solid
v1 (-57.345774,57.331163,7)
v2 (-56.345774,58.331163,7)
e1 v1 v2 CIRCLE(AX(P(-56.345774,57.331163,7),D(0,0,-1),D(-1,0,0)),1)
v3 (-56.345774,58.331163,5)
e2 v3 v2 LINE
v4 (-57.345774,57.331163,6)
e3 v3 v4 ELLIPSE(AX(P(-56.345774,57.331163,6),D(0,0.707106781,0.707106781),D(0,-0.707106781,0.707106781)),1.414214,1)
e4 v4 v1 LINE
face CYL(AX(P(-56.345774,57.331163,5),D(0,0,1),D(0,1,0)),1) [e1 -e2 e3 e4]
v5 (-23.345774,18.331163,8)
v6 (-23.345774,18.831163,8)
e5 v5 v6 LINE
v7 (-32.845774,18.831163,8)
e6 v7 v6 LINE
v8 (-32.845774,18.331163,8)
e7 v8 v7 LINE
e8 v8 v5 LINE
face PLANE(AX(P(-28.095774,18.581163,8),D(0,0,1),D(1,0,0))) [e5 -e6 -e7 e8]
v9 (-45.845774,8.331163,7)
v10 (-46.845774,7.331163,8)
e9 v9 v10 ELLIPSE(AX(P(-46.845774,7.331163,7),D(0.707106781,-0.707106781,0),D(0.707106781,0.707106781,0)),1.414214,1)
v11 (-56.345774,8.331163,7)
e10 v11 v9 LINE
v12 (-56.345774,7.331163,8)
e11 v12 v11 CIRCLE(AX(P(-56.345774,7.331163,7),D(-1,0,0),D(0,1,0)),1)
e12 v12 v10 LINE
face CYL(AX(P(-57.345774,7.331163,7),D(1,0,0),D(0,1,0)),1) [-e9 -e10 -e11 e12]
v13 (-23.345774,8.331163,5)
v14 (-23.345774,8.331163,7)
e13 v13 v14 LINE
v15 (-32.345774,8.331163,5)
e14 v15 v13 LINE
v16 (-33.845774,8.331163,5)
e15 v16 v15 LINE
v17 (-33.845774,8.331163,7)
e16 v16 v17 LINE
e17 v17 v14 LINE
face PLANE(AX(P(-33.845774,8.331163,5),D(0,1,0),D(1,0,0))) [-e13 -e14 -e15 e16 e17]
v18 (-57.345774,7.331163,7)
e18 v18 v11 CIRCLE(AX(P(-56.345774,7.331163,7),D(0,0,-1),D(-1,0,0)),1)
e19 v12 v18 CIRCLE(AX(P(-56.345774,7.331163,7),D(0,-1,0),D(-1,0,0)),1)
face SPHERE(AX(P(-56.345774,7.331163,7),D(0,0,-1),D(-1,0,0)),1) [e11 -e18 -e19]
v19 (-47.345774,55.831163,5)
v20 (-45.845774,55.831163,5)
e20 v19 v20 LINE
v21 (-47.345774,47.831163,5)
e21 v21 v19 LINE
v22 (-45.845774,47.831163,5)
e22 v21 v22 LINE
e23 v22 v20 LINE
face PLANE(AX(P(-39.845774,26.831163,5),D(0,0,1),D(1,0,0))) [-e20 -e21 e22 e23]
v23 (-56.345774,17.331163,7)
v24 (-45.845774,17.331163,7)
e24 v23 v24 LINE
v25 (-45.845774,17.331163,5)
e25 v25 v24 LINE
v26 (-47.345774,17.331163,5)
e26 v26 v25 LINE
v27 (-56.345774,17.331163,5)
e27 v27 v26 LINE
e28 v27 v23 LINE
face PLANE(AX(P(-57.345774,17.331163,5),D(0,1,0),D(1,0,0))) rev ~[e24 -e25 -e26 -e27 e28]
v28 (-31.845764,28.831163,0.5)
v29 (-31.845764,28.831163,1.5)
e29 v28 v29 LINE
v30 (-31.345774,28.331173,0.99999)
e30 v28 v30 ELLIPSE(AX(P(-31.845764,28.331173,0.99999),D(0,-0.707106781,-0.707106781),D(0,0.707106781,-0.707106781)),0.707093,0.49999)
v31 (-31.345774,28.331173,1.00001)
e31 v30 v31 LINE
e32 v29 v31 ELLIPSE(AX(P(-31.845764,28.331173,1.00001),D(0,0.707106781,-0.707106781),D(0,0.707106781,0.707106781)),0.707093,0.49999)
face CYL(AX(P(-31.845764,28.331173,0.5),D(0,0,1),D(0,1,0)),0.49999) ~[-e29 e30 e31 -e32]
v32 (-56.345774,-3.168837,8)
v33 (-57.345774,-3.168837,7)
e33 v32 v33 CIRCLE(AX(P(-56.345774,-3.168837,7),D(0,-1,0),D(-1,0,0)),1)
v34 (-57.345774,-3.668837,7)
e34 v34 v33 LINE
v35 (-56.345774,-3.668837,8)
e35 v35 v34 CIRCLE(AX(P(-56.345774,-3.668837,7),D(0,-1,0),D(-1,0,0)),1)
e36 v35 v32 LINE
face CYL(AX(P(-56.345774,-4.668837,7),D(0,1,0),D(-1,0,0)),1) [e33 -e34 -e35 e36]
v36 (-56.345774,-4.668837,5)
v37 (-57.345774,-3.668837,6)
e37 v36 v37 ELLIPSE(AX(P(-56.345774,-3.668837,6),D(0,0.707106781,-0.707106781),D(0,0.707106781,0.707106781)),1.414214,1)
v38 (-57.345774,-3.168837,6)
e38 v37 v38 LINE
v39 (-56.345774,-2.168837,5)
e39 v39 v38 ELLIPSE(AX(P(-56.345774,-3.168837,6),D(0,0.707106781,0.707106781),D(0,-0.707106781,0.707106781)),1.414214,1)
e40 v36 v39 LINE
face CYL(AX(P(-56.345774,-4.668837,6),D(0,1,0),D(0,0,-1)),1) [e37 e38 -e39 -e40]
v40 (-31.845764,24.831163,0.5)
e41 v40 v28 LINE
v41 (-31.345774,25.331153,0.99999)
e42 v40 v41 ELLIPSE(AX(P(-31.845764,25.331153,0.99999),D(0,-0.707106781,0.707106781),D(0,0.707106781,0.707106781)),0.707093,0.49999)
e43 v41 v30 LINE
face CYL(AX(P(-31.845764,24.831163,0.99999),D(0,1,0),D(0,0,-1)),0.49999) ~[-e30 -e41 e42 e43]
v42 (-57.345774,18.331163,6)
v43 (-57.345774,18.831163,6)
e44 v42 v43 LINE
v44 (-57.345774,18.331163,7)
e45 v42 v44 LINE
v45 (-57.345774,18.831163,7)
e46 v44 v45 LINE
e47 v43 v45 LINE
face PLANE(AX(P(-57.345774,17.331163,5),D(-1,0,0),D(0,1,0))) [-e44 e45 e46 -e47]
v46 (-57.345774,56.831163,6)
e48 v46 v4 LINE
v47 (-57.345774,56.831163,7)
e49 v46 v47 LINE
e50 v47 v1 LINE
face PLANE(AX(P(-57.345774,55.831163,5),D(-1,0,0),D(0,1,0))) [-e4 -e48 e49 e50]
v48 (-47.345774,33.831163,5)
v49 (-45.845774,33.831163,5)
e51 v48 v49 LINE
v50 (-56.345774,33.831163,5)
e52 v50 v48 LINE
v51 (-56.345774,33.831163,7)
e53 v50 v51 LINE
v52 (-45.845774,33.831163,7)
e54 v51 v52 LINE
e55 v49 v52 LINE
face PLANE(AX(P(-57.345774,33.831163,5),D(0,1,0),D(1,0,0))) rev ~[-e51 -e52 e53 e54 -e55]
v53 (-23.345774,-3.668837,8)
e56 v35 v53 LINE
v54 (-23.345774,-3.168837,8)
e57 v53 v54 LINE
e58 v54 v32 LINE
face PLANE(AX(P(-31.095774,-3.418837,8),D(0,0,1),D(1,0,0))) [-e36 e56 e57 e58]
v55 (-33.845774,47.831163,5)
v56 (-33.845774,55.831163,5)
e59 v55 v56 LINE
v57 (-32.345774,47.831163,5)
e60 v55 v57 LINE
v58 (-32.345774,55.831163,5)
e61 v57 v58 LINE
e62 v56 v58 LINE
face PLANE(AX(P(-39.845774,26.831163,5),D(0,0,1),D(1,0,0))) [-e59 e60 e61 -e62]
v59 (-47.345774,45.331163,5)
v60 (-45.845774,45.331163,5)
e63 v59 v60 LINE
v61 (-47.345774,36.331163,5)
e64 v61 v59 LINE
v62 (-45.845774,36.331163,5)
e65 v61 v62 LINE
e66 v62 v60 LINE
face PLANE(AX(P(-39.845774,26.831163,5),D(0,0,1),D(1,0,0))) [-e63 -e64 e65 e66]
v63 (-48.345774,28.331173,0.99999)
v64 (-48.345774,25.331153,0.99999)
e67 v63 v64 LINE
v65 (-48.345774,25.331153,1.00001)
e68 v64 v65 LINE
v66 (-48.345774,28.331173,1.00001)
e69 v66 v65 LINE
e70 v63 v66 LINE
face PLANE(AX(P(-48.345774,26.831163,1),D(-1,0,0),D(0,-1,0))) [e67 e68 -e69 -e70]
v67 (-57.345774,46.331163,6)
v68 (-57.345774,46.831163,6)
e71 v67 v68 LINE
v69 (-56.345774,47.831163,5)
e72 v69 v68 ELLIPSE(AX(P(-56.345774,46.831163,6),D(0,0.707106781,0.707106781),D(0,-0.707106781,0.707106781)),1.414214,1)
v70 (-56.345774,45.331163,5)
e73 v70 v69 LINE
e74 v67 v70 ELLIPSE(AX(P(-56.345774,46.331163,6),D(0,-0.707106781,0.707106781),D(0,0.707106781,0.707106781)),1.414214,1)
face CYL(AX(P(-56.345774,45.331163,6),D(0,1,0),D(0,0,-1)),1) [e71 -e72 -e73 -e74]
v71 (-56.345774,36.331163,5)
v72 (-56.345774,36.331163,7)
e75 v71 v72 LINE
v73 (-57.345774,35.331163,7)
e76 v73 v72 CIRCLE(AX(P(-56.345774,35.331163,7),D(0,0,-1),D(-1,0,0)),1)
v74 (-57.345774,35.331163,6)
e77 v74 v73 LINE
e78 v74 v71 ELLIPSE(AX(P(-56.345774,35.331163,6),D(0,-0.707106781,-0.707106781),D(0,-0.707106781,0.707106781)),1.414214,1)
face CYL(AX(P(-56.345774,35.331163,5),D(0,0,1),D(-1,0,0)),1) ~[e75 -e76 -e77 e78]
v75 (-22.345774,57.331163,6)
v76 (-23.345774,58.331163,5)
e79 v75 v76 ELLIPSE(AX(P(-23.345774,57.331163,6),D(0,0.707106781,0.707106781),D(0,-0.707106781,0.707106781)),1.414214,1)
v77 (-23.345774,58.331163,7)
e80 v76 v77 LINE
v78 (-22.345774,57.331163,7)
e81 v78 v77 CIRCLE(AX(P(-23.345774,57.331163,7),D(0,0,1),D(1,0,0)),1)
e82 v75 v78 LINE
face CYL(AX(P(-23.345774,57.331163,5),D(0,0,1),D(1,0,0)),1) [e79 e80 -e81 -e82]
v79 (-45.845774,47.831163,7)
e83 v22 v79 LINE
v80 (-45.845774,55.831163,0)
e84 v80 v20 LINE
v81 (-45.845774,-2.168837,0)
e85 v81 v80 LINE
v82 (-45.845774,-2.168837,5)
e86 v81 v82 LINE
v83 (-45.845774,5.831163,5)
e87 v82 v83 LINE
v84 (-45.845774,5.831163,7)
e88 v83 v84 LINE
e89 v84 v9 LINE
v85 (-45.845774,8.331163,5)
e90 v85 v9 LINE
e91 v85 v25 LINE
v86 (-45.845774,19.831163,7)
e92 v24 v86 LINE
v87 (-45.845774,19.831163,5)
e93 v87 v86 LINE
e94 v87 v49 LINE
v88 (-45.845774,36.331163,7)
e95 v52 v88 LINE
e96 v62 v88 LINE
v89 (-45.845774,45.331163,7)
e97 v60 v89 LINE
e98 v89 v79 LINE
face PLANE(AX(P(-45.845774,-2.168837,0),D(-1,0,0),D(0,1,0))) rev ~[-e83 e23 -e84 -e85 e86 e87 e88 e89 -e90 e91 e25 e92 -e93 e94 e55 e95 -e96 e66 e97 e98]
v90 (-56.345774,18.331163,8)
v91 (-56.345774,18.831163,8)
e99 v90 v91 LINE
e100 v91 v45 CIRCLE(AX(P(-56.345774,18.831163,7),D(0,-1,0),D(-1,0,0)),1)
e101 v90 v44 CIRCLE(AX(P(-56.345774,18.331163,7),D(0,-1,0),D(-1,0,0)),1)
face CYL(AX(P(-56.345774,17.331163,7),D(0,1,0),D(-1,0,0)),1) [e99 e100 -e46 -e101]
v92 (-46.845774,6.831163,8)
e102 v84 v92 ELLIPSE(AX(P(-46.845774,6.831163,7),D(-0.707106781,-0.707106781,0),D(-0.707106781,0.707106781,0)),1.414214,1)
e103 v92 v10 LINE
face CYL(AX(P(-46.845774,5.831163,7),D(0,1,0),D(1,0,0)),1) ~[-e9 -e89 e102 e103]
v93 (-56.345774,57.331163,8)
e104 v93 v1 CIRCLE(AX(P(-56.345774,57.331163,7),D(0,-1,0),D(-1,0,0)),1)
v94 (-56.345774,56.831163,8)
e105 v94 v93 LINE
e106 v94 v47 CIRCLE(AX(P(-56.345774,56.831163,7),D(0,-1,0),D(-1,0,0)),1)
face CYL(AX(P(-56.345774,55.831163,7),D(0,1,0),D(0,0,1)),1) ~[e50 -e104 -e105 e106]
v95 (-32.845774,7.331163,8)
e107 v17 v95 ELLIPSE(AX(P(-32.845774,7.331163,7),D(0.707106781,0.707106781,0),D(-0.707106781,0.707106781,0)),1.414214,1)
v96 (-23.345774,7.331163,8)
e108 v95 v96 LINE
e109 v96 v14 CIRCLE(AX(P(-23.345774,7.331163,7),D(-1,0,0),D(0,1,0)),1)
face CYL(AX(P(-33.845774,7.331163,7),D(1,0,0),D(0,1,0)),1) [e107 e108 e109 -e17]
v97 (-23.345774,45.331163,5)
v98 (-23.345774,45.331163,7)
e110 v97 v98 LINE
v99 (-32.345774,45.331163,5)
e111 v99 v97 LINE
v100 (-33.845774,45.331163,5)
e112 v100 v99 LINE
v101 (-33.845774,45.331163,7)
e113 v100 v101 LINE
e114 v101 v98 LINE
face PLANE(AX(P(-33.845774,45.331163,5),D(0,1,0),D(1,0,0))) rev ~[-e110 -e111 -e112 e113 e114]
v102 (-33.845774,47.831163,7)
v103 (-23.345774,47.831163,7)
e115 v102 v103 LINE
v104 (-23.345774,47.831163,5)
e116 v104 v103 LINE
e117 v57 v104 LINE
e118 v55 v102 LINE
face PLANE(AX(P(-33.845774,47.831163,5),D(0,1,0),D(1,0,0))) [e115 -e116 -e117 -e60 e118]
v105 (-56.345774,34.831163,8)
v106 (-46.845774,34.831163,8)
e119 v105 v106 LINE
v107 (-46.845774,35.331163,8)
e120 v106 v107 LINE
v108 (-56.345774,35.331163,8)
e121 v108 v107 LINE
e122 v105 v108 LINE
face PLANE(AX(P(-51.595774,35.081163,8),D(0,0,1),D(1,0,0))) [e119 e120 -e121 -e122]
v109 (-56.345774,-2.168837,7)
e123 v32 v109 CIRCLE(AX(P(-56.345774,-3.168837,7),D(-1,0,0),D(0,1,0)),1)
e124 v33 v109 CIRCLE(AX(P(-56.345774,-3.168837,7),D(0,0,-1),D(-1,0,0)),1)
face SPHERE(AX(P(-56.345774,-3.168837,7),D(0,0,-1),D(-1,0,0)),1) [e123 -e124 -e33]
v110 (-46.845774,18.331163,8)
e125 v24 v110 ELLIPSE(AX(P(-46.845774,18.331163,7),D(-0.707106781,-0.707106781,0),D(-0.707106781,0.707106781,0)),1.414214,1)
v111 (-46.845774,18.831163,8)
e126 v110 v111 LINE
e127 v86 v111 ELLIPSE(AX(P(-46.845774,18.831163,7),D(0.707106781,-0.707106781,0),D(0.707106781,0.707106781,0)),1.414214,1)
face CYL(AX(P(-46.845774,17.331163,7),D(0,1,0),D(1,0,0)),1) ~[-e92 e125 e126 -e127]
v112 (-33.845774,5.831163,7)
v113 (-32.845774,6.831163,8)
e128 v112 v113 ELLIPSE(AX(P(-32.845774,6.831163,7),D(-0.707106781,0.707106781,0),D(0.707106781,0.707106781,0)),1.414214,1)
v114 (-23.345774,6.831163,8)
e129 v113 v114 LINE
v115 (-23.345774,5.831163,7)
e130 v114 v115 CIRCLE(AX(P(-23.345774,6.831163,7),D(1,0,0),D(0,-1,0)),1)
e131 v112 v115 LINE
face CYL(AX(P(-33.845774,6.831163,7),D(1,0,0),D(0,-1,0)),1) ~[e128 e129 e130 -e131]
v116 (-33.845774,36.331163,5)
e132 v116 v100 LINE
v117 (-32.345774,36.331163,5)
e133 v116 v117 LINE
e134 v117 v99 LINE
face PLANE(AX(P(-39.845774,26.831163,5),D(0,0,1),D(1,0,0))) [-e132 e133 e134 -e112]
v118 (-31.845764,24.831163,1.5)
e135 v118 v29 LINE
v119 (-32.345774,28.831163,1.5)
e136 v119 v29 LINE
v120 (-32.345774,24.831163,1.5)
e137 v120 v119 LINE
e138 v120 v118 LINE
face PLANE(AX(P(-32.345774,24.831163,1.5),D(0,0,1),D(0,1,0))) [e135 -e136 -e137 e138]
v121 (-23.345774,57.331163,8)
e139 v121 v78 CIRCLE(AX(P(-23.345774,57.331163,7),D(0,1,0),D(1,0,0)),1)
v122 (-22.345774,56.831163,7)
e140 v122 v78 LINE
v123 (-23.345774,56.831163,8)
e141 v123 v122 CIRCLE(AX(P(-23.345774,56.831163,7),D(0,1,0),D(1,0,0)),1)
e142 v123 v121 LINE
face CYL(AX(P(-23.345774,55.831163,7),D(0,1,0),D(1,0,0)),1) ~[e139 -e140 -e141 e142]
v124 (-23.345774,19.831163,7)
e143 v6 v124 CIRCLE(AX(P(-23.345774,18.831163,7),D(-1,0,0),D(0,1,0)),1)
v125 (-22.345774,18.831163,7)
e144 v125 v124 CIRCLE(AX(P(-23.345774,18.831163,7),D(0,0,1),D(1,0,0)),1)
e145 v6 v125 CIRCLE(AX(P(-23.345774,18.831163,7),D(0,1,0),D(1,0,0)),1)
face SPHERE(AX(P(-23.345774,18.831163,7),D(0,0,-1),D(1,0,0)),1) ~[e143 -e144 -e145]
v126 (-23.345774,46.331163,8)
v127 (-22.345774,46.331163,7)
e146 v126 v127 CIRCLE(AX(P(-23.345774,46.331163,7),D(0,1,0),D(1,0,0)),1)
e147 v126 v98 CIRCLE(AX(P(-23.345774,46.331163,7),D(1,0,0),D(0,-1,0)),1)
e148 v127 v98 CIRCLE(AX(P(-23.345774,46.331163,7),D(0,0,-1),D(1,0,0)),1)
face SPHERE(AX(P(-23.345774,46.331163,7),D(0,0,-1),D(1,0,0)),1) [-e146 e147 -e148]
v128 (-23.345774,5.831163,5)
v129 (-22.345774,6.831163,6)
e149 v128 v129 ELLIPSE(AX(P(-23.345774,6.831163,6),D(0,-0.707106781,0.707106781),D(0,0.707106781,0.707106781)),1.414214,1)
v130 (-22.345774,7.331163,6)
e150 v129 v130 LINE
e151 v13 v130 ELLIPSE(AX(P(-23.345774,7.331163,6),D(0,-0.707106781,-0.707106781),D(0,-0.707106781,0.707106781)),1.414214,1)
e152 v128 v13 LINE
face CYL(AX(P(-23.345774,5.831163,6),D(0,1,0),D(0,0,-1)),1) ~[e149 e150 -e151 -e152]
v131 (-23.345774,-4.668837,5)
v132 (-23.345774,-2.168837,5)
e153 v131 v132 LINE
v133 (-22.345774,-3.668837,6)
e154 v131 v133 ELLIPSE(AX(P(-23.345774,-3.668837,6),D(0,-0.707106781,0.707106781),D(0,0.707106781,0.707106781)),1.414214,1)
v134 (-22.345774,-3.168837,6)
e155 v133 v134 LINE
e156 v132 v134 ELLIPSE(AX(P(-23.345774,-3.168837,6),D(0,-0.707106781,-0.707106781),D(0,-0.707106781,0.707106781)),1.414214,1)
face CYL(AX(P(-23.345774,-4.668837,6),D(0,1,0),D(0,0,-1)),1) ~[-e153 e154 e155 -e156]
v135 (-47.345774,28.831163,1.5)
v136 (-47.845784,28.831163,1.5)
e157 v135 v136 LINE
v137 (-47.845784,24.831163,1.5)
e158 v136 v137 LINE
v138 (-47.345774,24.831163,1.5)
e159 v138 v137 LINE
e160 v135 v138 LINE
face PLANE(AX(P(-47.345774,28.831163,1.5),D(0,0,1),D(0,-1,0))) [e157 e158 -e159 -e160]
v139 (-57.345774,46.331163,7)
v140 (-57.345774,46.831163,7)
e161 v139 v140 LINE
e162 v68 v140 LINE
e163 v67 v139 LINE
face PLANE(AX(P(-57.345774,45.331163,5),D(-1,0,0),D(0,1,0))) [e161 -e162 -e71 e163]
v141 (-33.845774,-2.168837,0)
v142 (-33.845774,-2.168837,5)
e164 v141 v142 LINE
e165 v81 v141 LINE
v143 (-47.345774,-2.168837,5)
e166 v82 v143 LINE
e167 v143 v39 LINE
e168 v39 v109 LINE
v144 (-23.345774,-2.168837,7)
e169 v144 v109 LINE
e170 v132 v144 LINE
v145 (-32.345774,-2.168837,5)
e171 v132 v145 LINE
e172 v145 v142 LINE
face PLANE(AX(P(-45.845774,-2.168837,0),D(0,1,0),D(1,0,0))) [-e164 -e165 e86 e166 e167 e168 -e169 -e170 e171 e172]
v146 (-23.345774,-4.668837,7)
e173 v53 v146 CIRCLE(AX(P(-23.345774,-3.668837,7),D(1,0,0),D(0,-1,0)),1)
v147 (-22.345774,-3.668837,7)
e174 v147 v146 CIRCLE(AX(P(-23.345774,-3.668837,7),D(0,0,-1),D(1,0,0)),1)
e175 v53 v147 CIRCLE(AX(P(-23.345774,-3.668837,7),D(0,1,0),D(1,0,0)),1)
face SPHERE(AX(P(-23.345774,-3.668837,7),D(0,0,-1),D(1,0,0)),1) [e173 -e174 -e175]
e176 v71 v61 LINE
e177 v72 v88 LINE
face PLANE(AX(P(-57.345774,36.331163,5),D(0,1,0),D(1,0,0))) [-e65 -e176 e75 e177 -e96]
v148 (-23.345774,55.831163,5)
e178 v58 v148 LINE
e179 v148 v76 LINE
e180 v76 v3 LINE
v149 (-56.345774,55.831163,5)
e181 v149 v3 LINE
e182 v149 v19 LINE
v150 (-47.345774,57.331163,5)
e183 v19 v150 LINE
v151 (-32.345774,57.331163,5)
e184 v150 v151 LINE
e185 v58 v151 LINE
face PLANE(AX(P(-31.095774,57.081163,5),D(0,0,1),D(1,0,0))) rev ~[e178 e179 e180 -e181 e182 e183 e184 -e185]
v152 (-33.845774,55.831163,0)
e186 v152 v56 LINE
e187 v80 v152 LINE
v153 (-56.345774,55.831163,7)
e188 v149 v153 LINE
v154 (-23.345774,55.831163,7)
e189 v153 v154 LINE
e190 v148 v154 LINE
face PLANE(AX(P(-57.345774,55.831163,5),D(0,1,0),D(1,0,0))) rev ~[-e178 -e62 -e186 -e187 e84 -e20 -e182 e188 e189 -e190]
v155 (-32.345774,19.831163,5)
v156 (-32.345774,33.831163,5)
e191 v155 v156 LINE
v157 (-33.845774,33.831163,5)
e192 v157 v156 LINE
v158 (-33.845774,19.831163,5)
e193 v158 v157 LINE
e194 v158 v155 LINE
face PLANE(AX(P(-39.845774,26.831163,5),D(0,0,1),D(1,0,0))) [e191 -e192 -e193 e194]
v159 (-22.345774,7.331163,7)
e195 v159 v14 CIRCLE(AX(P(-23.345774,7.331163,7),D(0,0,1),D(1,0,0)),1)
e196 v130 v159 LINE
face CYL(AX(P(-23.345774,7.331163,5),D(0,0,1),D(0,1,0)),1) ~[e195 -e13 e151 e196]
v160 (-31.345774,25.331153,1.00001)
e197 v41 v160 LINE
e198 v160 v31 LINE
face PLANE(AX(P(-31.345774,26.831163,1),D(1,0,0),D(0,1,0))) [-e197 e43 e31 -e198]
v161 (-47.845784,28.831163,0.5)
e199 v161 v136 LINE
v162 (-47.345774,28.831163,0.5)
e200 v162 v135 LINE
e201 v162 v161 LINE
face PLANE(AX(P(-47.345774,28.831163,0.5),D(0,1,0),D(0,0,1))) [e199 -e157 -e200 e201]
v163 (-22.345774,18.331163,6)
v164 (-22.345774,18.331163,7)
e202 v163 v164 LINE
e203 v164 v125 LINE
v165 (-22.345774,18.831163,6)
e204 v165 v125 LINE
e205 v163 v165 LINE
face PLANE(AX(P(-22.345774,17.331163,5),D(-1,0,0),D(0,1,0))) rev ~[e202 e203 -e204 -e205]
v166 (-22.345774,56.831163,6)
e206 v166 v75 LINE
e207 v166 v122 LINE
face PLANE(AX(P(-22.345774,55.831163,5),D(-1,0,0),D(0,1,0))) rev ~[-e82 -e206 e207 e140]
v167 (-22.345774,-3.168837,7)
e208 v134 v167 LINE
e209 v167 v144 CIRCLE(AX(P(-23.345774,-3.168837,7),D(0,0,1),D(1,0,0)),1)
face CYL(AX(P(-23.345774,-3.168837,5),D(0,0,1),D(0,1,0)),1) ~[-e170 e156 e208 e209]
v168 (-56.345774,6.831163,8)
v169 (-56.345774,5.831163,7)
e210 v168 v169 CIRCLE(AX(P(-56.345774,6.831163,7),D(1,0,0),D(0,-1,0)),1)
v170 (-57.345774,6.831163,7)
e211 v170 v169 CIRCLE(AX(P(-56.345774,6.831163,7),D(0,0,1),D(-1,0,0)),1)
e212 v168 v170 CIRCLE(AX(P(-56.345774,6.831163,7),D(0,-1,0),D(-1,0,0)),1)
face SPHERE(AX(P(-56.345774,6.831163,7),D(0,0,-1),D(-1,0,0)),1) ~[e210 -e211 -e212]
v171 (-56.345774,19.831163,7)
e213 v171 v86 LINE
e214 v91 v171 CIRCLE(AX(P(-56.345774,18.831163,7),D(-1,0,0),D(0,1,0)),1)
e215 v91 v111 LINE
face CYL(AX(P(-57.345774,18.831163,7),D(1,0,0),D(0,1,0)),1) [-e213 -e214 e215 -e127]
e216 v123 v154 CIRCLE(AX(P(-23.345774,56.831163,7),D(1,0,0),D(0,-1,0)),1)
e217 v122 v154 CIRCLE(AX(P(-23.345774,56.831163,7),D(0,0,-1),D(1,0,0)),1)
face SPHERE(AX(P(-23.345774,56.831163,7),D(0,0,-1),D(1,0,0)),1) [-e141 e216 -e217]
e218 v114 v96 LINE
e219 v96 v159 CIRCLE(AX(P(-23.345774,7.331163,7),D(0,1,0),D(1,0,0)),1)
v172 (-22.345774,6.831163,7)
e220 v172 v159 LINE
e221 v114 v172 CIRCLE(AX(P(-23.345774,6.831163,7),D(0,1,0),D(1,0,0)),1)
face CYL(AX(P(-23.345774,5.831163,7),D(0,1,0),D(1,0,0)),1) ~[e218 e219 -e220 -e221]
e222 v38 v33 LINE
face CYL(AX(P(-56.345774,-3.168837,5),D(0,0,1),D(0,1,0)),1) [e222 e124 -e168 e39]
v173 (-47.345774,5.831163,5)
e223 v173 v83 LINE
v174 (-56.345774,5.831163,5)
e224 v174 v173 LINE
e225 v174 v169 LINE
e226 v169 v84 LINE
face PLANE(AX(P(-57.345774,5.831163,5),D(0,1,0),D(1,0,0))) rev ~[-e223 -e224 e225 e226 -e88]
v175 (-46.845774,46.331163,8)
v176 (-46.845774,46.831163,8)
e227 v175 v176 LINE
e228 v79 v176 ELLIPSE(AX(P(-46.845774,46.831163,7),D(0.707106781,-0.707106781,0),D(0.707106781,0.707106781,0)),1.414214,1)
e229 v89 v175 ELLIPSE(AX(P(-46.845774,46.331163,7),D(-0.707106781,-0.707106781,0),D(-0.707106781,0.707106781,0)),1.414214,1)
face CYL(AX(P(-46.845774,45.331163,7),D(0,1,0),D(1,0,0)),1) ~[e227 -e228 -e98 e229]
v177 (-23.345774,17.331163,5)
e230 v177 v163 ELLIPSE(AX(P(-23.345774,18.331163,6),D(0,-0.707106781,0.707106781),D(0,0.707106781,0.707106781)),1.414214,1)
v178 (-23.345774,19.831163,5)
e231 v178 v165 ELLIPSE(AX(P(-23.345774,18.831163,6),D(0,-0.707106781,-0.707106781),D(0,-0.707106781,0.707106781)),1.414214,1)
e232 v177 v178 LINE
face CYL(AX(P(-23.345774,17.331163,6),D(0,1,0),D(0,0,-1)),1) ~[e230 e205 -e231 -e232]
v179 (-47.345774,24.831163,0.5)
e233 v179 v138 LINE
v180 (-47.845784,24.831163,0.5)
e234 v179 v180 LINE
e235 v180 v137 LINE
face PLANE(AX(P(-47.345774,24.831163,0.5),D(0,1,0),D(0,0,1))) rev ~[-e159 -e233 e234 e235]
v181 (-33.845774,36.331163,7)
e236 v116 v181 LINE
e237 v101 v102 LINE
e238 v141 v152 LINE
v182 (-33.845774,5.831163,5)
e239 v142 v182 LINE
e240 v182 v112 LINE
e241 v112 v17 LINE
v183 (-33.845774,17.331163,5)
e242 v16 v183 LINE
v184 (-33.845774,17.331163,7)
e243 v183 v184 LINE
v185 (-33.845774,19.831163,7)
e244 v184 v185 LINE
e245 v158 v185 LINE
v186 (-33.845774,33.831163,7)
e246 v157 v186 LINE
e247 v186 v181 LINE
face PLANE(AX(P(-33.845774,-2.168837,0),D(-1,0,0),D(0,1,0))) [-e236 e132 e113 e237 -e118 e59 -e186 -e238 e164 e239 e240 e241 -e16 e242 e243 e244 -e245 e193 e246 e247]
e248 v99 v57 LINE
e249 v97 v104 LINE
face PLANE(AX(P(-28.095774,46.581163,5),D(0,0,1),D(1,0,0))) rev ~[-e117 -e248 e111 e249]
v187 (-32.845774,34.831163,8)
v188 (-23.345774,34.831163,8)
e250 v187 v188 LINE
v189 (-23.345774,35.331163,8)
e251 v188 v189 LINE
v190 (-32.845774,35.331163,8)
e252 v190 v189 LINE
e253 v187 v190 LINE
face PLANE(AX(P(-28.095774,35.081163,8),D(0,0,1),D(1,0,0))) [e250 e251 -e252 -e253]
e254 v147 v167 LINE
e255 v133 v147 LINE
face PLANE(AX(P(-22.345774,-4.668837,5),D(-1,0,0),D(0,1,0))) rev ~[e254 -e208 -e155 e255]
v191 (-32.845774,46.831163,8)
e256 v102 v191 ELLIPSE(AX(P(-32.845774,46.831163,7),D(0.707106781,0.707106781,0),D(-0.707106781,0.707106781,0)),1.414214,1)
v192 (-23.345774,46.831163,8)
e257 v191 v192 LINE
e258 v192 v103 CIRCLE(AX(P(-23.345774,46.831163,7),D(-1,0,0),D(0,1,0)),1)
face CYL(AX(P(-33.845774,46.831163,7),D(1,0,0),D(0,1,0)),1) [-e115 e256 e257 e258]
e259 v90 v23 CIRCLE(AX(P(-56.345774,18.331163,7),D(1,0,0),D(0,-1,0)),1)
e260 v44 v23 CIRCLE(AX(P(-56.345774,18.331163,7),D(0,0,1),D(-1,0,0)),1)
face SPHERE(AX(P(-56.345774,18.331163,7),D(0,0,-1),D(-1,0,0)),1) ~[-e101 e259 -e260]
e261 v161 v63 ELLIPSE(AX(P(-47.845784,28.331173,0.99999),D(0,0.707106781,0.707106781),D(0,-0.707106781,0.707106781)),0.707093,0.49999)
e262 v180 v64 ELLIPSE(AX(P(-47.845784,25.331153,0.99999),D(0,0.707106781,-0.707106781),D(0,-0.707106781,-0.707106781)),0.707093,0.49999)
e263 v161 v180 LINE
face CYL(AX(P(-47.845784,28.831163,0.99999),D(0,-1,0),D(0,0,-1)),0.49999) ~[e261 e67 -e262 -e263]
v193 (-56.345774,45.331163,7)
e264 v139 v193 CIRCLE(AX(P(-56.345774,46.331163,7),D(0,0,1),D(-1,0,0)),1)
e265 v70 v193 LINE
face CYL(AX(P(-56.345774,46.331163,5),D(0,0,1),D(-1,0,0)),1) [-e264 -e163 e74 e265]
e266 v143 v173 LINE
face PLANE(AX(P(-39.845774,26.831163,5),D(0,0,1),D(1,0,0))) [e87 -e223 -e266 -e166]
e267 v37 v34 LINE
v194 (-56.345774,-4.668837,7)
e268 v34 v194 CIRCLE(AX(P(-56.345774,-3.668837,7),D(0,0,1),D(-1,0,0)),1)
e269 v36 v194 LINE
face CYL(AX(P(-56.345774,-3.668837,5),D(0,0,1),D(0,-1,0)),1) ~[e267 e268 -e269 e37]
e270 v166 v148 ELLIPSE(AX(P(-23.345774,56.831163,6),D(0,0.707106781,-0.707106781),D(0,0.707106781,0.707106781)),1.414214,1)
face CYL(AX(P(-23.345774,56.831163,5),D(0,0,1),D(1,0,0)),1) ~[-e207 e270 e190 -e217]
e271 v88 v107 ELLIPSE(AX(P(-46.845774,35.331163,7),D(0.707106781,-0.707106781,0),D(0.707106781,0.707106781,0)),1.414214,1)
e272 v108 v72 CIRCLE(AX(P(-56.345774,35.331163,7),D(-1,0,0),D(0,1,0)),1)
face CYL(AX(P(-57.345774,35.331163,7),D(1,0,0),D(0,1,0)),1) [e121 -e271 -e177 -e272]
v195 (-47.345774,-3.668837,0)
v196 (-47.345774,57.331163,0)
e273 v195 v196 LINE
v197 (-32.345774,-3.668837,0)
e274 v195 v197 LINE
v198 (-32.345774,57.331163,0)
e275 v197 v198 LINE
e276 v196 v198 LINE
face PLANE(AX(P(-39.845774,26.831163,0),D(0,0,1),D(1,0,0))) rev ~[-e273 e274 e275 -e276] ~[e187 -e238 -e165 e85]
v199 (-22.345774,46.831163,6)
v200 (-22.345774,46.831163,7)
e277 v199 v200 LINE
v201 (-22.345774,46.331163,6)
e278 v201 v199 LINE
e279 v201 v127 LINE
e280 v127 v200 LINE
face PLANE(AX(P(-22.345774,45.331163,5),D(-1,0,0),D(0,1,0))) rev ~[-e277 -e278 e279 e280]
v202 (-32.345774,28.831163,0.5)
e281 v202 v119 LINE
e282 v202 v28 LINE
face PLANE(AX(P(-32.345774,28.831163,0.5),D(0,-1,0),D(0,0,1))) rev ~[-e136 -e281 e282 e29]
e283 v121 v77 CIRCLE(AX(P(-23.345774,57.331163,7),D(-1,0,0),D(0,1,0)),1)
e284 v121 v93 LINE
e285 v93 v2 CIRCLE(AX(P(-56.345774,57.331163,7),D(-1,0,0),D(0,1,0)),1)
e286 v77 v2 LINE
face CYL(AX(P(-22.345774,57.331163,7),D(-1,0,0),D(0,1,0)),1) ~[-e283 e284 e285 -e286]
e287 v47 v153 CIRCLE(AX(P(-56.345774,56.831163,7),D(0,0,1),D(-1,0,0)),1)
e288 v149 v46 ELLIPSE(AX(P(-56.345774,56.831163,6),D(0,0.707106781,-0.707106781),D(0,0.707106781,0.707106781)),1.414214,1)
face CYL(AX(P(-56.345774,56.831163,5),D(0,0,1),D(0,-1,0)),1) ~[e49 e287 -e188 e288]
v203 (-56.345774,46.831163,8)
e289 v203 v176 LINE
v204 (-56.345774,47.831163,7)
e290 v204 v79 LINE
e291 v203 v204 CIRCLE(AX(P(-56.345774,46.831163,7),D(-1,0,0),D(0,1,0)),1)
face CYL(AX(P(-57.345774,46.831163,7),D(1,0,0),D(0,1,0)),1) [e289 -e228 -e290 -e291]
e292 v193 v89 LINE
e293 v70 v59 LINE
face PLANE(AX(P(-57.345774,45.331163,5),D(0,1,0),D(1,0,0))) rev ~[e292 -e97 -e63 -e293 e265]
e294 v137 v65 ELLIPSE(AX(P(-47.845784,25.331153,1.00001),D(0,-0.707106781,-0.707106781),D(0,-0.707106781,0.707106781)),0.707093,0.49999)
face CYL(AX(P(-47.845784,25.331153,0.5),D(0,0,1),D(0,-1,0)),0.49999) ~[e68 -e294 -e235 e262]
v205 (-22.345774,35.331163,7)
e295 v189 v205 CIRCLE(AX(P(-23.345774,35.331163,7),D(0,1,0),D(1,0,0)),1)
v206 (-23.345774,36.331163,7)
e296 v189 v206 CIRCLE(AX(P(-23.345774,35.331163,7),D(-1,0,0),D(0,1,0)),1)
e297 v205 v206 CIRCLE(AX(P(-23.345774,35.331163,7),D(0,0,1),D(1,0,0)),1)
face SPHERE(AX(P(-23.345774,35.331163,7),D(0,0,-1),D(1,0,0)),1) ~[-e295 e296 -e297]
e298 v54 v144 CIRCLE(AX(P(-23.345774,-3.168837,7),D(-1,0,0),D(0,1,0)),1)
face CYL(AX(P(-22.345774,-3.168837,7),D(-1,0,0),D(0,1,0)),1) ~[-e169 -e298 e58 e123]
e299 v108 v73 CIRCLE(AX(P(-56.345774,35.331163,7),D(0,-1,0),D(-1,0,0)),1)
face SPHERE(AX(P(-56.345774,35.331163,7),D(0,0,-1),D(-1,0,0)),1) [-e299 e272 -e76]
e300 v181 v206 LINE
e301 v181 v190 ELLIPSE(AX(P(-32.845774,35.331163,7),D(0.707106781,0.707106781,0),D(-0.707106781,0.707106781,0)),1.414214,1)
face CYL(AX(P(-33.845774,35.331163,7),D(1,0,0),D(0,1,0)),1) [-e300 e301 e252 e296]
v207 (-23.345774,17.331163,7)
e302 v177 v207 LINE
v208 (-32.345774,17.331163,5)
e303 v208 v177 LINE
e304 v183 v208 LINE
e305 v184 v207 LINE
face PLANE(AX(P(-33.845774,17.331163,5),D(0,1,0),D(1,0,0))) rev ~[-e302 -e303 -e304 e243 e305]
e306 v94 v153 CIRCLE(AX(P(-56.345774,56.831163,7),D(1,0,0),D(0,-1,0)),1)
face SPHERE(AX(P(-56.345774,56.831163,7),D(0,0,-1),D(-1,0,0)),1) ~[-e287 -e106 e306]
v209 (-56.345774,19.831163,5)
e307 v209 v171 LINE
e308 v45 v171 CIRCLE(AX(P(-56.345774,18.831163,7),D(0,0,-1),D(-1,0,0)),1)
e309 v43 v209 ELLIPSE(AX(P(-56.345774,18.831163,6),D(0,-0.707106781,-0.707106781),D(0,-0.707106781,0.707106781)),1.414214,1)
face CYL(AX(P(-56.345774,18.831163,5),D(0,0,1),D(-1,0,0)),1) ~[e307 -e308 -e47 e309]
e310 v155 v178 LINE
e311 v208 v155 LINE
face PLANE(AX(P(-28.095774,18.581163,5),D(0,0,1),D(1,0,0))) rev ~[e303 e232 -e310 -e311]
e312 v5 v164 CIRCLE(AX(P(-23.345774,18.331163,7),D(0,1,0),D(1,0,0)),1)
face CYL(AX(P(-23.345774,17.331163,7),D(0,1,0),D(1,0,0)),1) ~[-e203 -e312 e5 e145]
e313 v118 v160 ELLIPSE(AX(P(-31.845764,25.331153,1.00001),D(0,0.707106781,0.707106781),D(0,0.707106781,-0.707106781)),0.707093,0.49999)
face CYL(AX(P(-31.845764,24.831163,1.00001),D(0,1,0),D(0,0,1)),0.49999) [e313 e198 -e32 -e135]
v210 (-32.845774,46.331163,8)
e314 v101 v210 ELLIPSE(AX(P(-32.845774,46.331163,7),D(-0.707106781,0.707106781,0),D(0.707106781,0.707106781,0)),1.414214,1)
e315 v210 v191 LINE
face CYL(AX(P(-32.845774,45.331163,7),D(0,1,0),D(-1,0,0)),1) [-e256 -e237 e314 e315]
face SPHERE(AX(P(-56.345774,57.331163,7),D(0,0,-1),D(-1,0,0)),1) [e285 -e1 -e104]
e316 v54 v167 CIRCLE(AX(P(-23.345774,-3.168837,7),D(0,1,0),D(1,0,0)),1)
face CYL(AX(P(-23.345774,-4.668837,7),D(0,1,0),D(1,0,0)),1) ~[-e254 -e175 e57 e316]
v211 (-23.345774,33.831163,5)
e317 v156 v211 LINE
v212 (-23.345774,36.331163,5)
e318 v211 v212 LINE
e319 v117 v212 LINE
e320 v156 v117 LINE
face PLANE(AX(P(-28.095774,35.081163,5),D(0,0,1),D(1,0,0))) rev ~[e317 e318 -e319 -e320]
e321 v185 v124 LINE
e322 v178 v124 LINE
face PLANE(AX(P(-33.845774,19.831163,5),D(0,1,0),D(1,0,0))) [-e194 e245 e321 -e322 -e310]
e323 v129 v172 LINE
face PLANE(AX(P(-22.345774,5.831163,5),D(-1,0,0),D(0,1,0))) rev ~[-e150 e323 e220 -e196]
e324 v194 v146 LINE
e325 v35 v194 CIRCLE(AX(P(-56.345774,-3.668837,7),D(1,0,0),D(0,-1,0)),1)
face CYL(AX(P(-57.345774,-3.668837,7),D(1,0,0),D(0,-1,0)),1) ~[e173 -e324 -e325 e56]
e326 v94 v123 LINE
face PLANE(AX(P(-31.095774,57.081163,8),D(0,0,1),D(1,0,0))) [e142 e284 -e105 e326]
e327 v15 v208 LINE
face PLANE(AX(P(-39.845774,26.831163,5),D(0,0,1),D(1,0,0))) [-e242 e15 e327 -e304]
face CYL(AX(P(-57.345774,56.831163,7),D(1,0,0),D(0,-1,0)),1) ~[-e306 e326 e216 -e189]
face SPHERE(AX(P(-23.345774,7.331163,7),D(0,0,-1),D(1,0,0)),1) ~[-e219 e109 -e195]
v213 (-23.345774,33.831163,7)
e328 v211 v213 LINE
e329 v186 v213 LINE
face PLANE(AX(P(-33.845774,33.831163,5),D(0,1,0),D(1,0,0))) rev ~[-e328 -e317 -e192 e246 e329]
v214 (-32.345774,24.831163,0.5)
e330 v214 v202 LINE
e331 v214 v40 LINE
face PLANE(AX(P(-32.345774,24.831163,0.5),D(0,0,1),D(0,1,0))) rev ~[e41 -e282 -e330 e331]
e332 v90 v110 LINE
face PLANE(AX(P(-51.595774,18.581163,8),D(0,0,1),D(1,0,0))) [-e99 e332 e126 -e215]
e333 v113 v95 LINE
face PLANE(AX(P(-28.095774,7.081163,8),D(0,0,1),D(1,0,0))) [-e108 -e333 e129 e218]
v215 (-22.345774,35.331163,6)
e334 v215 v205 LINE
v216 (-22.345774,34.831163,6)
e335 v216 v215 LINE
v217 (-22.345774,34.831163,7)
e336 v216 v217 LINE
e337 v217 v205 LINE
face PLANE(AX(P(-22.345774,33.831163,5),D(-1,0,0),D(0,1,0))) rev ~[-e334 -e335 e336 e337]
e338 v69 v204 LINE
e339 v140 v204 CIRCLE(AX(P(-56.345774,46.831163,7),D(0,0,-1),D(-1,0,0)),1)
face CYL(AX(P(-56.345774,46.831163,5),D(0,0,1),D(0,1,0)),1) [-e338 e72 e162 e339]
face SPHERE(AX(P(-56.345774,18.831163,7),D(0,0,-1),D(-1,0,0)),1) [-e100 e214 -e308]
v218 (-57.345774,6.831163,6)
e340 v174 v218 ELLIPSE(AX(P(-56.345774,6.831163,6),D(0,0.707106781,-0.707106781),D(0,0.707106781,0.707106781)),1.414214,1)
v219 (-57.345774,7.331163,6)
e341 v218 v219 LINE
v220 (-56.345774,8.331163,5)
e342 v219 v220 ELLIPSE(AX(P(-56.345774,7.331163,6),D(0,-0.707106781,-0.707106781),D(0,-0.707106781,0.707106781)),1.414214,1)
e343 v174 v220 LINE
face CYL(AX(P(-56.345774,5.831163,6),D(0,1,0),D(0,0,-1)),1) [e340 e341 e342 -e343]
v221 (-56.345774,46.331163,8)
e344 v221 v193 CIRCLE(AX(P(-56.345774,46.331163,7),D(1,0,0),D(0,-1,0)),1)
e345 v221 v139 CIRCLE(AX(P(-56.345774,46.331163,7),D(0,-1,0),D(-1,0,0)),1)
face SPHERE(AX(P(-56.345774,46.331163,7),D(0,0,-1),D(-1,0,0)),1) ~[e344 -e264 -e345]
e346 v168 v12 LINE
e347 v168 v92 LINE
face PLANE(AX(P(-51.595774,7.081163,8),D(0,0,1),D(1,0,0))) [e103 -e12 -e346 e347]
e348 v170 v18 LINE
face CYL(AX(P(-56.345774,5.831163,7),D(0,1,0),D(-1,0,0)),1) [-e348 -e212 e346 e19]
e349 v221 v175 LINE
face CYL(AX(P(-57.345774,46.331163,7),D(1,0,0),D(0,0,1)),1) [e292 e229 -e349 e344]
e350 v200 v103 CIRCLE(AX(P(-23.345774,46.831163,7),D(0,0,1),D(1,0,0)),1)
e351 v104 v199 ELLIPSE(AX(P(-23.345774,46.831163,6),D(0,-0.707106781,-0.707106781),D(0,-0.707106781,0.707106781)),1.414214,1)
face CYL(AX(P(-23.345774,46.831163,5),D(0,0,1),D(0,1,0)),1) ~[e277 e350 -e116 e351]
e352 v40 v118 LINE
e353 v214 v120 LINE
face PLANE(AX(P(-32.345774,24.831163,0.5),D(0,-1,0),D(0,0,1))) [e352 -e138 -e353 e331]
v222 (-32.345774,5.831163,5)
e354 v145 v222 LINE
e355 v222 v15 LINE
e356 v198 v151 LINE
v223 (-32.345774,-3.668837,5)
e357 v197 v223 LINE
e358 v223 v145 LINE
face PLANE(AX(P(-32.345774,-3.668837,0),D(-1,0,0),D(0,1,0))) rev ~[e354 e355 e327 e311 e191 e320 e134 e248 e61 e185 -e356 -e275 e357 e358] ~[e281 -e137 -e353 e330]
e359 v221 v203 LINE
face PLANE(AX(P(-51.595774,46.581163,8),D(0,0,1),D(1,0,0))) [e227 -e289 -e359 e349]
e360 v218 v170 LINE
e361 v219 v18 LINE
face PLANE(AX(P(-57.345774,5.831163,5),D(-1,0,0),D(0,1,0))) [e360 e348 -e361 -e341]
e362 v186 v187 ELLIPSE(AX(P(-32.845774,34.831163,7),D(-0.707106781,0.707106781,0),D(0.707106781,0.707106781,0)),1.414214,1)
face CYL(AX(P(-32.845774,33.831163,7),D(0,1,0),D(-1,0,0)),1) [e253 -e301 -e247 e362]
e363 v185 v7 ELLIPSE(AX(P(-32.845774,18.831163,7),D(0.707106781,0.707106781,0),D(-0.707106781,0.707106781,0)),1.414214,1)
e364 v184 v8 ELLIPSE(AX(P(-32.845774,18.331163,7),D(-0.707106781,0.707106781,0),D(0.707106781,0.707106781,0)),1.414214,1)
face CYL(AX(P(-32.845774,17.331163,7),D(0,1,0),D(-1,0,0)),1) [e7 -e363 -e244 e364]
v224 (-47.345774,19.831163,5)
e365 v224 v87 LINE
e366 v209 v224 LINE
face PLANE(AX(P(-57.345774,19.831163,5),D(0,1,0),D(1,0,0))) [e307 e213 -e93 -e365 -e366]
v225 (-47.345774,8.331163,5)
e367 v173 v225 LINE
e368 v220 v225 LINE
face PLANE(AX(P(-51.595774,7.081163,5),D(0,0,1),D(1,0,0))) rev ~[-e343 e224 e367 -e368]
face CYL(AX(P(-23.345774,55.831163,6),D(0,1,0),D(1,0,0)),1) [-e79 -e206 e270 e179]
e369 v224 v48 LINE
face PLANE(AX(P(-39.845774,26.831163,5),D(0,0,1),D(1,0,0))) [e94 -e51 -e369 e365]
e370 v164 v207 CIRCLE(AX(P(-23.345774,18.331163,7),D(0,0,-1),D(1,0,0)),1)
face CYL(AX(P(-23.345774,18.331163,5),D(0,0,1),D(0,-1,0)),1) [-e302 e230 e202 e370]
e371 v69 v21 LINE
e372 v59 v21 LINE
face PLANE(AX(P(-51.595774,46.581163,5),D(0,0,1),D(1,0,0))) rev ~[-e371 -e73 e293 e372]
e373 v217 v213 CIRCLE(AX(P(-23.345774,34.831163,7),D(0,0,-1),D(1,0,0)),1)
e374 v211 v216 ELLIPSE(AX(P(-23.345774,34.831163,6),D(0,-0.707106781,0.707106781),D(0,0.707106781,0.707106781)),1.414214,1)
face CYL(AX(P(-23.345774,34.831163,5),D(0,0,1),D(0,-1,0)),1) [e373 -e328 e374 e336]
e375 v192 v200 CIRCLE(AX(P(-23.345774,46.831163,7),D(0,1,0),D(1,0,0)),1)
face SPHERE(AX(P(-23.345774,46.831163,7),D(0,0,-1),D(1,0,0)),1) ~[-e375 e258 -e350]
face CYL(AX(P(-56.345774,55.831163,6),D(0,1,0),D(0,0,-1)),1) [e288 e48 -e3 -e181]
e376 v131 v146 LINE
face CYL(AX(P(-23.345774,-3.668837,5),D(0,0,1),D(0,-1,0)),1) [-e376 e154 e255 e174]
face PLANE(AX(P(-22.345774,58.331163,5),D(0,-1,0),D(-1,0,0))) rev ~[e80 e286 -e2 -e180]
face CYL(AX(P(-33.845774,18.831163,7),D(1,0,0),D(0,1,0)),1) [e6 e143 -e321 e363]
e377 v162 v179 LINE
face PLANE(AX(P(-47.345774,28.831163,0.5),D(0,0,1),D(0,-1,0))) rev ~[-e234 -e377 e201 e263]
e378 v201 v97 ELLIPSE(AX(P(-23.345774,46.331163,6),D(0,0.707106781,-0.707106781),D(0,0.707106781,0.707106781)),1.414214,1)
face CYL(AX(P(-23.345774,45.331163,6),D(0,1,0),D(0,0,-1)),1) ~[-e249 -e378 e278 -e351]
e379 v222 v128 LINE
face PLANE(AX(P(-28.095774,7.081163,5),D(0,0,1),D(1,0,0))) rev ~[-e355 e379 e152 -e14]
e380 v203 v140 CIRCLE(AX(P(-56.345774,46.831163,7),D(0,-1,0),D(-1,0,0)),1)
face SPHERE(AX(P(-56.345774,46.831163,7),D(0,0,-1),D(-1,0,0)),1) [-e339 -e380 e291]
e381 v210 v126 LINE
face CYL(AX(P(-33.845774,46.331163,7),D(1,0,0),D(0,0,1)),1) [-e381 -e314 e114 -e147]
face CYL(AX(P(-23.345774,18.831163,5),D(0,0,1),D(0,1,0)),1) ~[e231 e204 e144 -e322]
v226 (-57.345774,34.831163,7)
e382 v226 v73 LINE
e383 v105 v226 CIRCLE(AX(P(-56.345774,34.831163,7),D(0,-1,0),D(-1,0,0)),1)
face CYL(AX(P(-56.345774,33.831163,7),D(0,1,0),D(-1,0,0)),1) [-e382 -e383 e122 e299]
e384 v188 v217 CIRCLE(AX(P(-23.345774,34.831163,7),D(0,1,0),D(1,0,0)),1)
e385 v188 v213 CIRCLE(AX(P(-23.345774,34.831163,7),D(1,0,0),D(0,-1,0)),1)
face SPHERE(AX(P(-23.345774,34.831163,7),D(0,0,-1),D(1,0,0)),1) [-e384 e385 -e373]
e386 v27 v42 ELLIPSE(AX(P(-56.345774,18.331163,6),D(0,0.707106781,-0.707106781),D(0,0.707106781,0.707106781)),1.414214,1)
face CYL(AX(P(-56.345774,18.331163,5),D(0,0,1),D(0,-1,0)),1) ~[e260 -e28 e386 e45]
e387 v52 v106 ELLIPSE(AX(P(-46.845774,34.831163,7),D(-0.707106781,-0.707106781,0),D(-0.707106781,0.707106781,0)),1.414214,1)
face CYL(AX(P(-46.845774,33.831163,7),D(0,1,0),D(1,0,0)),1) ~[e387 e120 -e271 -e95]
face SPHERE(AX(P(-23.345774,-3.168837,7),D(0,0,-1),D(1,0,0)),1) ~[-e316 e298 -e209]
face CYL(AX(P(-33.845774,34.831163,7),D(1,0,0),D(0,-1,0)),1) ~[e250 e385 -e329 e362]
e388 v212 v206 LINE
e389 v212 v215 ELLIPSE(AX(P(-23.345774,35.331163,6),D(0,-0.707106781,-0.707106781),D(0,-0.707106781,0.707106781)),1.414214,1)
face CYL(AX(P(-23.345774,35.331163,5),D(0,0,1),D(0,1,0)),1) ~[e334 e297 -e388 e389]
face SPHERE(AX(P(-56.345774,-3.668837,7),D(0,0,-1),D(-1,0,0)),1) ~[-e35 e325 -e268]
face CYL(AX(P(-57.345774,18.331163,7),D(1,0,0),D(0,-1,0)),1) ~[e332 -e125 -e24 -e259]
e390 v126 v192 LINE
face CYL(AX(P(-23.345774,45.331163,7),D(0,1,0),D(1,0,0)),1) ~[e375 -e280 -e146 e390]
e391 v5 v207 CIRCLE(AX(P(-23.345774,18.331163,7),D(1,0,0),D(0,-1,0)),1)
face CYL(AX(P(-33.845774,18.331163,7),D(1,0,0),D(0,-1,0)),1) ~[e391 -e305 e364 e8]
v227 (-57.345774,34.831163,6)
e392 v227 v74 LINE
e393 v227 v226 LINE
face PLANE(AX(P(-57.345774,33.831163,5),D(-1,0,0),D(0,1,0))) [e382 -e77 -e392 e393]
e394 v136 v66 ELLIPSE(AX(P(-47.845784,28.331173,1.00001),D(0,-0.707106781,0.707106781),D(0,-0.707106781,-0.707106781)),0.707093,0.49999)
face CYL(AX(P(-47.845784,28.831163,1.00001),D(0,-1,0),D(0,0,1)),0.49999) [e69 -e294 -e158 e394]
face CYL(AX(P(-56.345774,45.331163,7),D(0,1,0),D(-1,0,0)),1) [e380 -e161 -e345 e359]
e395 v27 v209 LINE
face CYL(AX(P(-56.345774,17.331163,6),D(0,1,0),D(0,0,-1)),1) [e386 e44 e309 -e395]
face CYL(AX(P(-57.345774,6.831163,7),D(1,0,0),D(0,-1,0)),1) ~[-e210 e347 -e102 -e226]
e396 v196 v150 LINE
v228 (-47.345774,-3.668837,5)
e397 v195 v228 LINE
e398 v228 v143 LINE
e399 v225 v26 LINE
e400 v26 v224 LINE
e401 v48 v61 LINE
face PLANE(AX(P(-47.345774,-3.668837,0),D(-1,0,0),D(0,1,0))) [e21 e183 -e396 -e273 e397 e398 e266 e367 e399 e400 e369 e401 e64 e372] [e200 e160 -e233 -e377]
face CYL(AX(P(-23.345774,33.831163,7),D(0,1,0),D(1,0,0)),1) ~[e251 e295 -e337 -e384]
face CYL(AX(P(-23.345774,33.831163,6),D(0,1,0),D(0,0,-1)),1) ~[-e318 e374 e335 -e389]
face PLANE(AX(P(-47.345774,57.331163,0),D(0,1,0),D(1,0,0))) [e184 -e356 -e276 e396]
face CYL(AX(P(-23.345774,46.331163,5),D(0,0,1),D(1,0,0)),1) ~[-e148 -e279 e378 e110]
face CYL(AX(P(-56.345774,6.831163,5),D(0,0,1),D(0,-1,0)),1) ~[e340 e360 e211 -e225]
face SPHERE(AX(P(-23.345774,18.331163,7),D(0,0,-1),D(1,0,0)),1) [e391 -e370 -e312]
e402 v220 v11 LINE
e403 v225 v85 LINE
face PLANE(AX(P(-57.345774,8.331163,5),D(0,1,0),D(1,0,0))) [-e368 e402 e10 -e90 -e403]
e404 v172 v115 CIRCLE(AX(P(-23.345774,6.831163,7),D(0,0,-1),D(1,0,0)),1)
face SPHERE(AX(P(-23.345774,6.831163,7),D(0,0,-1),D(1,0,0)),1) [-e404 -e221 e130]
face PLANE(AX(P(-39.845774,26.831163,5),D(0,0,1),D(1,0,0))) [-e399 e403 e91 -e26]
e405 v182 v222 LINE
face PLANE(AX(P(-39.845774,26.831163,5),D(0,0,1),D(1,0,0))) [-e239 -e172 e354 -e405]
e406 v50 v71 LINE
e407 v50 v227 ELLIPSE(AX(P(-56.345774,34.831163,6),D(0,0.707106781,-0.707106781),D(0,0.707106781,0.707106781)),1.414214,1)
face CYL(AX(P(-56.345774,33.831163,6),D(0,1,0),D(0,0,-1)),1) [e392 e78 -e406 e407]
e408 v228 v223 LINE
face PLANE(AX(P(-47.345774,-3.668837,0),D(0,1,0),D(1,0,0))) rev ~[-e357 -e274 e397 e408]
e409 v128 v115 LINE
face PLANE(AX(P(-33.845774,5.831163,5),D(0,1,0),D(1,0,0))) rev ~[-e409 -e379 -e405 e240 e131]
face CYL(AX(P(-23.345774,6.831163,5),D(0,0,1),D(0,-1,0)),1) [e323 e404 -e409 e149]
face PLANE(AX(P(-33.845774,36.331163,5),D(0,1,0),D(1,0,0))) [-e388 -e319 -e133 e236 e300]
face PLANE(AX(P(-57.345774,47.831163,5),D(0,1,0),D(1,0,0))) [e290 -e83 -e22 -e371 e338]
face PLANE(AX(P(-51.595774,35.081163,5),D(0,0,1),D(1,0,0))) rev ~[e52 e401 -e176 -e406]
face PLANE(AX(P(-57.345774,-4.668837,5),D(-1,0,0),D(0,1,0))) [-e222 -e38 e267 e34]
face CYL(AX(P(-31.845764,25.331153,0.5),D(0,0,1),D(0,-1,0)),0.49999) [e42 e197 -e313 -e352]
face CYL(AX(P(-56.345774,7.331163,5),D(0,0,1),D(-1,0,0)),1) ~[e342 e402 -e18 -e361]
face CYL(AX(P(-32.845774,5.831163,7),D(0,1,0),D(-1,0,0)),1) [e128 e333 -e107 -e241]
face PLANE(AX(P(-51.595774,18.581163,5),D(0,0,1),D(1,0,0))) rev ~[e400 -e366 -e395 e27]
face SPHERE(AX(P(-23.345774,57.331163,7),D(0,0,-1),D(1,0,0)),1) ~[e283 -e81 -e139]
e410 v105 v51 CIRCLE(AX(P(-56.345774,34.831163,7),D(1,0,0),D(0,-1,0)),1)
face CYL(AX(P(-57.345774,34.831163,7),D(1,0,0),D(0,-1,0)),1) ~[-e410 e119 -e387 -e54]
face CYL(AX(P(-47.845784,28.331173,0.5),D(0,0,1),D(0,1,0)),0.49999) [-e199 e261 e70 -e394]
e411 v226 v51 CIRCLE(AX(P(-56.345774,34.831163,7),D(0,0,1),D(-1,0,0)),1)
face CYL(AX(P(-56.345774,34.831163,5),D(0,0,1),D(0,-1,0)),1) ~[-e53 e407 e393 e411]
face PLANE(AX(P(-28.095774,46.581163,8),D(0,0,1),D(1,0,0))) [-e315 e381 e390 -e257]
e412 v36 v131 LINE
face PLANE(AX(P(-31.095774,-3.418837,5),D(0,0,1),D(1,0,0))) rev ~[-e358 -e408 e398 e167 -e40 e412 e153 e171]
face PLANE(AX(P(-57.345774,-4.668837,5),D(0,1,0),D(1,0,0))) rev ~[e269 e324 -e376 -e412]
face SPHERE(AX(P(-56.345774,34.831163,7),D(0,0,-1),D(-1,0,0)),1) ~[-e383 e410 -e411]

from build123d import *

# Parameters (mm, degrees)
F0_W     = 15
F0_H     = 61
F0_W_2   = 12
F0_H_2   = 58
F1_DEPTH = 5
F2_W     = 17.5
F2_H     = 2.5
F2_W_2   = 11.5
F3_DEPTH = 3
F4_R     = 1
F5_W     = 4
F5_H     = 1
F6_DEPTH = 1
F7_R     = 0.49999
F8_W     = 4
F8_H     = 1
F9_DEPTH = 1
F10_R    = 0.49999


# Not quite as in the source:
# - a fillet or chamfer is up to 0.001 mm smaller than in the source, because OpenCascade refuses the exact size


with BuildPart() as f1:
    # F0 (on Top) → F1 (new body)
    with BuildSketch(Plane.XY):
        with Locations((-39.8457739502, 26.8311633799)):
            Rectangle(F0_W, F0_H)
        with Locations((-39.8457739502, 26.8311633799)):
            Rectangle(F0_W_2, F0_H_2, mode=Mode.SUBTRACT)
    extrude(amount=F1_DEPTH)

    # F2 (on face) → F3 (join)
    with BuildSketch(Plane.XY.offset(5)):
        with Locations((-31.0957739502, 57.0811633799)):
            Rectangle(F2_W, F2_H)
        with Locations((-48.5957739502, 57.0811633799)):
            Rectangle(F2_W, F2_H)
        with Locations((-31.0957739502, -3.4188366201)):
            Rectangle(F2_W, F2_H)
        with Locations((-48.5957739502, -3.4188366201)):
            Rectangle(F2_W, F2_H)
        with Locations((-28.0957739502, 35.0811633799)):
            Rectangle(F2_W_2, F2_H)
        with Locations((-28.0957739502, 18.5811633799)):
            Rectangle(F2_W_2, F2_H)
        with Locations((-51.5957739502, 18.5811633799)):
            Rectangle(F2_W_2, F2_H)
        with Locations((-51.5957739502, 35.0811633799)):
            Rectangle(F2_W_2, F2_H)
        with Locations((-28.0957739502, 46.5811633799)):
            Rectangle(F2_W_2, F2_H)
        with Locations((-28.0957739502, 7.0811633799)):
            Rectangle(F2_W_2, F2_H)
        with Locations((-51.5957739502, 46.5811633799)):
            Rectangle(F2_W_2, F2_H)
        with Locations((-51.5957739502, 7.0811633799)):
            Rectangle(F2_W_2, F2_H)
    extrude(amount=F3_DEPTH)

    # F4
    f4_edges = [f1.edges().sort_by_distance(p)[0] for p in [
        (-22.345774, 55.831163, 6.5),
        (-22.345774, 58.331163, 6.5),
        (-22.345774, 57.081163, 5),
        (-22.345774, 57.081163, 8),
        (-22.345774, 45.331163, 6.5),
        (-22.345774, 47.831163, 6.5),
        (-22.345774, 46.581163, 5),
        (-22.345774, 46.581163, 8),
        (-22.345774, 33.831163, 6.5),
        (-22.345774, 36.331163, 6.5),
        (-22.345774, 35.081163, 5),
        (-22.345774, 35.081163, 8),
        (-22.345774, 17.331163, 6.5),
        (-22.345774, 19.831163, 6.5),
        (-22.345774, 18.581163, 5),
        (-22.345774, 18.581163, 8),
        (-22.345774, 5.831163, 6.5),
        (-22.345774, 8.331163, 6.5),
        (-22.345774, 7.081163, 5),
        (-22.345774, 7.081163, 8),
        (-22.345774, -4.668837, 6.5),
        (-22.345774, -2.168837, 6.5),
        (-22.345774, -3.418837, 5),
        (-22.345774, -3.418837, 8),
        (-45.845774, 46.581163, 8),
        (-45.845774, 35.081163, 8),
        (-45.845774, 18.581163, 8),
        (-45.845774, 7.081163, 8),
        (-57.345774, -2.168837, 6.5),
        (-57.345774, -4.668837, 6.5),
        (-57.345774, -3.418837, 5),
        (-57.345774, -3.418837, 8),
        (-57.345774, 8.331163, 6.5),
        (-57.345774, 5.831163, 6.5),
        (-57.345774, 7.081163, 5),
        (-57.345774, 7.081163, 8),
        (-57.345774, 19.831163, 6.5),
        (-57.345774, 17.331163, 6.5),
        (-57.345774, 18.581163, 5),
        (-57.345774, 18.581163, 8),
        (-57.345774, 36.331163, 6.5),
        (-57.345774, 33.831163, 6.5),
        (-57.345774, 35.081163, 5),
        (-57.345774, 35.081163, 8),
        (-57.345774, 47.831163, 6.5),
        (-57.345774, 45.331163, 6.5),
        (-57.345774, 46.581163, 5),
        (-57.345774, 46.581163, 8),
        (-57.345774, 58.331163, 6.5),
        (-57.345774, 55.831163, 6.5),
        (-57.345774, 57.081163, 5),
        (-57.345774, 57.081163, 8),
        (-33.845774, 46.581163, 8),
        (-33.845774, 35.081163, 8),
        (-33.845774, 18.581163, 8),
        (-33.845774, 7.081163, 8),
        (-39.845774, 55.831163, 8),
        (-51.595774, 45.331163, 8),
        (-28.095774, 45.331163, 8),
        (-51.595774, 33.831163, 8),
        (-28.095774, 33.831163, 8),
        (-51.595774, 17.331163, 8),
        (-28.095774, 17.331163, 8),
        (-51.595774, 5.831163, 8),
        (-28.095774, 5.831163, 8),
        (-39.845774, -4.668837, 8),
        (-39.845774, -2.168837, 8),
        (-51.595774, 8.331163, 8),
        (-28.095774, 8.331163, 8),
        (-28.095774, 19.831163, 8),
        (-51.595774, 19.831163, 8),
        (-51.595774, 36.331163, 8),
        (-28.095774, 36.331163, 8),
        (-51.595774, 47.831163, 8),
        (-28.095774, 47.831163, 8),
        (-39.845774, 58.331163, 8),
    ]]
    fillet(f4_edges, radius=F4_R)

    # F5 (on face) → F6 (join)
    with BuildSketch(Plane.YZ.offset(-32.3457739502)):
        with Locations((26.8311633799, 1)):
            Rectangle(F5_W, F5_H)
    extrude(amount=F6_DEPTH)

    # F7 (radius 0.5 in the source; OpenCascade refuses exactly that, so slightly less here)
    f7_edges = [f1.edges().sort_by_distance(p)[0] for p in [
        (-31.345774, 26.831163, 1.5),
        (-31.345774, 24.831163, 1),
        (-31.345774, 26.831163, 0.5),
        (-31.345774, 28.831163, 1),
    ]]
    fillet(f7_edges, radius=F7_R)

    # F8 (on face) → F9 (join)
    with BuildSketch(Plane(origin=(-47.3457739502, 0, 0), x_dir=(0, -1, 0), z_dir=(-1, 0, 0))):
        with Locations((-26.8311633799, 1)):
            Rectangle(F8_W, F8_H)
    extrude(amount=F9_DEPTH)

    # F10 (radius 0.5 in the source; OpenCascade refuses exactly that, so slightly less here)
    f10_edges = [f1.edges().sort_by_distance(p)[0] for p in [
        (-48.345774, 26.831163, 1.5),
        (-48.345774, 28.831163, 1),
        (-48.345774, 26.831163, 0.5),
        (-48.345774, 24.831163, 1),
    ]]
    fillet(f10_edges, radius=F10_R)


solid = f1.part
